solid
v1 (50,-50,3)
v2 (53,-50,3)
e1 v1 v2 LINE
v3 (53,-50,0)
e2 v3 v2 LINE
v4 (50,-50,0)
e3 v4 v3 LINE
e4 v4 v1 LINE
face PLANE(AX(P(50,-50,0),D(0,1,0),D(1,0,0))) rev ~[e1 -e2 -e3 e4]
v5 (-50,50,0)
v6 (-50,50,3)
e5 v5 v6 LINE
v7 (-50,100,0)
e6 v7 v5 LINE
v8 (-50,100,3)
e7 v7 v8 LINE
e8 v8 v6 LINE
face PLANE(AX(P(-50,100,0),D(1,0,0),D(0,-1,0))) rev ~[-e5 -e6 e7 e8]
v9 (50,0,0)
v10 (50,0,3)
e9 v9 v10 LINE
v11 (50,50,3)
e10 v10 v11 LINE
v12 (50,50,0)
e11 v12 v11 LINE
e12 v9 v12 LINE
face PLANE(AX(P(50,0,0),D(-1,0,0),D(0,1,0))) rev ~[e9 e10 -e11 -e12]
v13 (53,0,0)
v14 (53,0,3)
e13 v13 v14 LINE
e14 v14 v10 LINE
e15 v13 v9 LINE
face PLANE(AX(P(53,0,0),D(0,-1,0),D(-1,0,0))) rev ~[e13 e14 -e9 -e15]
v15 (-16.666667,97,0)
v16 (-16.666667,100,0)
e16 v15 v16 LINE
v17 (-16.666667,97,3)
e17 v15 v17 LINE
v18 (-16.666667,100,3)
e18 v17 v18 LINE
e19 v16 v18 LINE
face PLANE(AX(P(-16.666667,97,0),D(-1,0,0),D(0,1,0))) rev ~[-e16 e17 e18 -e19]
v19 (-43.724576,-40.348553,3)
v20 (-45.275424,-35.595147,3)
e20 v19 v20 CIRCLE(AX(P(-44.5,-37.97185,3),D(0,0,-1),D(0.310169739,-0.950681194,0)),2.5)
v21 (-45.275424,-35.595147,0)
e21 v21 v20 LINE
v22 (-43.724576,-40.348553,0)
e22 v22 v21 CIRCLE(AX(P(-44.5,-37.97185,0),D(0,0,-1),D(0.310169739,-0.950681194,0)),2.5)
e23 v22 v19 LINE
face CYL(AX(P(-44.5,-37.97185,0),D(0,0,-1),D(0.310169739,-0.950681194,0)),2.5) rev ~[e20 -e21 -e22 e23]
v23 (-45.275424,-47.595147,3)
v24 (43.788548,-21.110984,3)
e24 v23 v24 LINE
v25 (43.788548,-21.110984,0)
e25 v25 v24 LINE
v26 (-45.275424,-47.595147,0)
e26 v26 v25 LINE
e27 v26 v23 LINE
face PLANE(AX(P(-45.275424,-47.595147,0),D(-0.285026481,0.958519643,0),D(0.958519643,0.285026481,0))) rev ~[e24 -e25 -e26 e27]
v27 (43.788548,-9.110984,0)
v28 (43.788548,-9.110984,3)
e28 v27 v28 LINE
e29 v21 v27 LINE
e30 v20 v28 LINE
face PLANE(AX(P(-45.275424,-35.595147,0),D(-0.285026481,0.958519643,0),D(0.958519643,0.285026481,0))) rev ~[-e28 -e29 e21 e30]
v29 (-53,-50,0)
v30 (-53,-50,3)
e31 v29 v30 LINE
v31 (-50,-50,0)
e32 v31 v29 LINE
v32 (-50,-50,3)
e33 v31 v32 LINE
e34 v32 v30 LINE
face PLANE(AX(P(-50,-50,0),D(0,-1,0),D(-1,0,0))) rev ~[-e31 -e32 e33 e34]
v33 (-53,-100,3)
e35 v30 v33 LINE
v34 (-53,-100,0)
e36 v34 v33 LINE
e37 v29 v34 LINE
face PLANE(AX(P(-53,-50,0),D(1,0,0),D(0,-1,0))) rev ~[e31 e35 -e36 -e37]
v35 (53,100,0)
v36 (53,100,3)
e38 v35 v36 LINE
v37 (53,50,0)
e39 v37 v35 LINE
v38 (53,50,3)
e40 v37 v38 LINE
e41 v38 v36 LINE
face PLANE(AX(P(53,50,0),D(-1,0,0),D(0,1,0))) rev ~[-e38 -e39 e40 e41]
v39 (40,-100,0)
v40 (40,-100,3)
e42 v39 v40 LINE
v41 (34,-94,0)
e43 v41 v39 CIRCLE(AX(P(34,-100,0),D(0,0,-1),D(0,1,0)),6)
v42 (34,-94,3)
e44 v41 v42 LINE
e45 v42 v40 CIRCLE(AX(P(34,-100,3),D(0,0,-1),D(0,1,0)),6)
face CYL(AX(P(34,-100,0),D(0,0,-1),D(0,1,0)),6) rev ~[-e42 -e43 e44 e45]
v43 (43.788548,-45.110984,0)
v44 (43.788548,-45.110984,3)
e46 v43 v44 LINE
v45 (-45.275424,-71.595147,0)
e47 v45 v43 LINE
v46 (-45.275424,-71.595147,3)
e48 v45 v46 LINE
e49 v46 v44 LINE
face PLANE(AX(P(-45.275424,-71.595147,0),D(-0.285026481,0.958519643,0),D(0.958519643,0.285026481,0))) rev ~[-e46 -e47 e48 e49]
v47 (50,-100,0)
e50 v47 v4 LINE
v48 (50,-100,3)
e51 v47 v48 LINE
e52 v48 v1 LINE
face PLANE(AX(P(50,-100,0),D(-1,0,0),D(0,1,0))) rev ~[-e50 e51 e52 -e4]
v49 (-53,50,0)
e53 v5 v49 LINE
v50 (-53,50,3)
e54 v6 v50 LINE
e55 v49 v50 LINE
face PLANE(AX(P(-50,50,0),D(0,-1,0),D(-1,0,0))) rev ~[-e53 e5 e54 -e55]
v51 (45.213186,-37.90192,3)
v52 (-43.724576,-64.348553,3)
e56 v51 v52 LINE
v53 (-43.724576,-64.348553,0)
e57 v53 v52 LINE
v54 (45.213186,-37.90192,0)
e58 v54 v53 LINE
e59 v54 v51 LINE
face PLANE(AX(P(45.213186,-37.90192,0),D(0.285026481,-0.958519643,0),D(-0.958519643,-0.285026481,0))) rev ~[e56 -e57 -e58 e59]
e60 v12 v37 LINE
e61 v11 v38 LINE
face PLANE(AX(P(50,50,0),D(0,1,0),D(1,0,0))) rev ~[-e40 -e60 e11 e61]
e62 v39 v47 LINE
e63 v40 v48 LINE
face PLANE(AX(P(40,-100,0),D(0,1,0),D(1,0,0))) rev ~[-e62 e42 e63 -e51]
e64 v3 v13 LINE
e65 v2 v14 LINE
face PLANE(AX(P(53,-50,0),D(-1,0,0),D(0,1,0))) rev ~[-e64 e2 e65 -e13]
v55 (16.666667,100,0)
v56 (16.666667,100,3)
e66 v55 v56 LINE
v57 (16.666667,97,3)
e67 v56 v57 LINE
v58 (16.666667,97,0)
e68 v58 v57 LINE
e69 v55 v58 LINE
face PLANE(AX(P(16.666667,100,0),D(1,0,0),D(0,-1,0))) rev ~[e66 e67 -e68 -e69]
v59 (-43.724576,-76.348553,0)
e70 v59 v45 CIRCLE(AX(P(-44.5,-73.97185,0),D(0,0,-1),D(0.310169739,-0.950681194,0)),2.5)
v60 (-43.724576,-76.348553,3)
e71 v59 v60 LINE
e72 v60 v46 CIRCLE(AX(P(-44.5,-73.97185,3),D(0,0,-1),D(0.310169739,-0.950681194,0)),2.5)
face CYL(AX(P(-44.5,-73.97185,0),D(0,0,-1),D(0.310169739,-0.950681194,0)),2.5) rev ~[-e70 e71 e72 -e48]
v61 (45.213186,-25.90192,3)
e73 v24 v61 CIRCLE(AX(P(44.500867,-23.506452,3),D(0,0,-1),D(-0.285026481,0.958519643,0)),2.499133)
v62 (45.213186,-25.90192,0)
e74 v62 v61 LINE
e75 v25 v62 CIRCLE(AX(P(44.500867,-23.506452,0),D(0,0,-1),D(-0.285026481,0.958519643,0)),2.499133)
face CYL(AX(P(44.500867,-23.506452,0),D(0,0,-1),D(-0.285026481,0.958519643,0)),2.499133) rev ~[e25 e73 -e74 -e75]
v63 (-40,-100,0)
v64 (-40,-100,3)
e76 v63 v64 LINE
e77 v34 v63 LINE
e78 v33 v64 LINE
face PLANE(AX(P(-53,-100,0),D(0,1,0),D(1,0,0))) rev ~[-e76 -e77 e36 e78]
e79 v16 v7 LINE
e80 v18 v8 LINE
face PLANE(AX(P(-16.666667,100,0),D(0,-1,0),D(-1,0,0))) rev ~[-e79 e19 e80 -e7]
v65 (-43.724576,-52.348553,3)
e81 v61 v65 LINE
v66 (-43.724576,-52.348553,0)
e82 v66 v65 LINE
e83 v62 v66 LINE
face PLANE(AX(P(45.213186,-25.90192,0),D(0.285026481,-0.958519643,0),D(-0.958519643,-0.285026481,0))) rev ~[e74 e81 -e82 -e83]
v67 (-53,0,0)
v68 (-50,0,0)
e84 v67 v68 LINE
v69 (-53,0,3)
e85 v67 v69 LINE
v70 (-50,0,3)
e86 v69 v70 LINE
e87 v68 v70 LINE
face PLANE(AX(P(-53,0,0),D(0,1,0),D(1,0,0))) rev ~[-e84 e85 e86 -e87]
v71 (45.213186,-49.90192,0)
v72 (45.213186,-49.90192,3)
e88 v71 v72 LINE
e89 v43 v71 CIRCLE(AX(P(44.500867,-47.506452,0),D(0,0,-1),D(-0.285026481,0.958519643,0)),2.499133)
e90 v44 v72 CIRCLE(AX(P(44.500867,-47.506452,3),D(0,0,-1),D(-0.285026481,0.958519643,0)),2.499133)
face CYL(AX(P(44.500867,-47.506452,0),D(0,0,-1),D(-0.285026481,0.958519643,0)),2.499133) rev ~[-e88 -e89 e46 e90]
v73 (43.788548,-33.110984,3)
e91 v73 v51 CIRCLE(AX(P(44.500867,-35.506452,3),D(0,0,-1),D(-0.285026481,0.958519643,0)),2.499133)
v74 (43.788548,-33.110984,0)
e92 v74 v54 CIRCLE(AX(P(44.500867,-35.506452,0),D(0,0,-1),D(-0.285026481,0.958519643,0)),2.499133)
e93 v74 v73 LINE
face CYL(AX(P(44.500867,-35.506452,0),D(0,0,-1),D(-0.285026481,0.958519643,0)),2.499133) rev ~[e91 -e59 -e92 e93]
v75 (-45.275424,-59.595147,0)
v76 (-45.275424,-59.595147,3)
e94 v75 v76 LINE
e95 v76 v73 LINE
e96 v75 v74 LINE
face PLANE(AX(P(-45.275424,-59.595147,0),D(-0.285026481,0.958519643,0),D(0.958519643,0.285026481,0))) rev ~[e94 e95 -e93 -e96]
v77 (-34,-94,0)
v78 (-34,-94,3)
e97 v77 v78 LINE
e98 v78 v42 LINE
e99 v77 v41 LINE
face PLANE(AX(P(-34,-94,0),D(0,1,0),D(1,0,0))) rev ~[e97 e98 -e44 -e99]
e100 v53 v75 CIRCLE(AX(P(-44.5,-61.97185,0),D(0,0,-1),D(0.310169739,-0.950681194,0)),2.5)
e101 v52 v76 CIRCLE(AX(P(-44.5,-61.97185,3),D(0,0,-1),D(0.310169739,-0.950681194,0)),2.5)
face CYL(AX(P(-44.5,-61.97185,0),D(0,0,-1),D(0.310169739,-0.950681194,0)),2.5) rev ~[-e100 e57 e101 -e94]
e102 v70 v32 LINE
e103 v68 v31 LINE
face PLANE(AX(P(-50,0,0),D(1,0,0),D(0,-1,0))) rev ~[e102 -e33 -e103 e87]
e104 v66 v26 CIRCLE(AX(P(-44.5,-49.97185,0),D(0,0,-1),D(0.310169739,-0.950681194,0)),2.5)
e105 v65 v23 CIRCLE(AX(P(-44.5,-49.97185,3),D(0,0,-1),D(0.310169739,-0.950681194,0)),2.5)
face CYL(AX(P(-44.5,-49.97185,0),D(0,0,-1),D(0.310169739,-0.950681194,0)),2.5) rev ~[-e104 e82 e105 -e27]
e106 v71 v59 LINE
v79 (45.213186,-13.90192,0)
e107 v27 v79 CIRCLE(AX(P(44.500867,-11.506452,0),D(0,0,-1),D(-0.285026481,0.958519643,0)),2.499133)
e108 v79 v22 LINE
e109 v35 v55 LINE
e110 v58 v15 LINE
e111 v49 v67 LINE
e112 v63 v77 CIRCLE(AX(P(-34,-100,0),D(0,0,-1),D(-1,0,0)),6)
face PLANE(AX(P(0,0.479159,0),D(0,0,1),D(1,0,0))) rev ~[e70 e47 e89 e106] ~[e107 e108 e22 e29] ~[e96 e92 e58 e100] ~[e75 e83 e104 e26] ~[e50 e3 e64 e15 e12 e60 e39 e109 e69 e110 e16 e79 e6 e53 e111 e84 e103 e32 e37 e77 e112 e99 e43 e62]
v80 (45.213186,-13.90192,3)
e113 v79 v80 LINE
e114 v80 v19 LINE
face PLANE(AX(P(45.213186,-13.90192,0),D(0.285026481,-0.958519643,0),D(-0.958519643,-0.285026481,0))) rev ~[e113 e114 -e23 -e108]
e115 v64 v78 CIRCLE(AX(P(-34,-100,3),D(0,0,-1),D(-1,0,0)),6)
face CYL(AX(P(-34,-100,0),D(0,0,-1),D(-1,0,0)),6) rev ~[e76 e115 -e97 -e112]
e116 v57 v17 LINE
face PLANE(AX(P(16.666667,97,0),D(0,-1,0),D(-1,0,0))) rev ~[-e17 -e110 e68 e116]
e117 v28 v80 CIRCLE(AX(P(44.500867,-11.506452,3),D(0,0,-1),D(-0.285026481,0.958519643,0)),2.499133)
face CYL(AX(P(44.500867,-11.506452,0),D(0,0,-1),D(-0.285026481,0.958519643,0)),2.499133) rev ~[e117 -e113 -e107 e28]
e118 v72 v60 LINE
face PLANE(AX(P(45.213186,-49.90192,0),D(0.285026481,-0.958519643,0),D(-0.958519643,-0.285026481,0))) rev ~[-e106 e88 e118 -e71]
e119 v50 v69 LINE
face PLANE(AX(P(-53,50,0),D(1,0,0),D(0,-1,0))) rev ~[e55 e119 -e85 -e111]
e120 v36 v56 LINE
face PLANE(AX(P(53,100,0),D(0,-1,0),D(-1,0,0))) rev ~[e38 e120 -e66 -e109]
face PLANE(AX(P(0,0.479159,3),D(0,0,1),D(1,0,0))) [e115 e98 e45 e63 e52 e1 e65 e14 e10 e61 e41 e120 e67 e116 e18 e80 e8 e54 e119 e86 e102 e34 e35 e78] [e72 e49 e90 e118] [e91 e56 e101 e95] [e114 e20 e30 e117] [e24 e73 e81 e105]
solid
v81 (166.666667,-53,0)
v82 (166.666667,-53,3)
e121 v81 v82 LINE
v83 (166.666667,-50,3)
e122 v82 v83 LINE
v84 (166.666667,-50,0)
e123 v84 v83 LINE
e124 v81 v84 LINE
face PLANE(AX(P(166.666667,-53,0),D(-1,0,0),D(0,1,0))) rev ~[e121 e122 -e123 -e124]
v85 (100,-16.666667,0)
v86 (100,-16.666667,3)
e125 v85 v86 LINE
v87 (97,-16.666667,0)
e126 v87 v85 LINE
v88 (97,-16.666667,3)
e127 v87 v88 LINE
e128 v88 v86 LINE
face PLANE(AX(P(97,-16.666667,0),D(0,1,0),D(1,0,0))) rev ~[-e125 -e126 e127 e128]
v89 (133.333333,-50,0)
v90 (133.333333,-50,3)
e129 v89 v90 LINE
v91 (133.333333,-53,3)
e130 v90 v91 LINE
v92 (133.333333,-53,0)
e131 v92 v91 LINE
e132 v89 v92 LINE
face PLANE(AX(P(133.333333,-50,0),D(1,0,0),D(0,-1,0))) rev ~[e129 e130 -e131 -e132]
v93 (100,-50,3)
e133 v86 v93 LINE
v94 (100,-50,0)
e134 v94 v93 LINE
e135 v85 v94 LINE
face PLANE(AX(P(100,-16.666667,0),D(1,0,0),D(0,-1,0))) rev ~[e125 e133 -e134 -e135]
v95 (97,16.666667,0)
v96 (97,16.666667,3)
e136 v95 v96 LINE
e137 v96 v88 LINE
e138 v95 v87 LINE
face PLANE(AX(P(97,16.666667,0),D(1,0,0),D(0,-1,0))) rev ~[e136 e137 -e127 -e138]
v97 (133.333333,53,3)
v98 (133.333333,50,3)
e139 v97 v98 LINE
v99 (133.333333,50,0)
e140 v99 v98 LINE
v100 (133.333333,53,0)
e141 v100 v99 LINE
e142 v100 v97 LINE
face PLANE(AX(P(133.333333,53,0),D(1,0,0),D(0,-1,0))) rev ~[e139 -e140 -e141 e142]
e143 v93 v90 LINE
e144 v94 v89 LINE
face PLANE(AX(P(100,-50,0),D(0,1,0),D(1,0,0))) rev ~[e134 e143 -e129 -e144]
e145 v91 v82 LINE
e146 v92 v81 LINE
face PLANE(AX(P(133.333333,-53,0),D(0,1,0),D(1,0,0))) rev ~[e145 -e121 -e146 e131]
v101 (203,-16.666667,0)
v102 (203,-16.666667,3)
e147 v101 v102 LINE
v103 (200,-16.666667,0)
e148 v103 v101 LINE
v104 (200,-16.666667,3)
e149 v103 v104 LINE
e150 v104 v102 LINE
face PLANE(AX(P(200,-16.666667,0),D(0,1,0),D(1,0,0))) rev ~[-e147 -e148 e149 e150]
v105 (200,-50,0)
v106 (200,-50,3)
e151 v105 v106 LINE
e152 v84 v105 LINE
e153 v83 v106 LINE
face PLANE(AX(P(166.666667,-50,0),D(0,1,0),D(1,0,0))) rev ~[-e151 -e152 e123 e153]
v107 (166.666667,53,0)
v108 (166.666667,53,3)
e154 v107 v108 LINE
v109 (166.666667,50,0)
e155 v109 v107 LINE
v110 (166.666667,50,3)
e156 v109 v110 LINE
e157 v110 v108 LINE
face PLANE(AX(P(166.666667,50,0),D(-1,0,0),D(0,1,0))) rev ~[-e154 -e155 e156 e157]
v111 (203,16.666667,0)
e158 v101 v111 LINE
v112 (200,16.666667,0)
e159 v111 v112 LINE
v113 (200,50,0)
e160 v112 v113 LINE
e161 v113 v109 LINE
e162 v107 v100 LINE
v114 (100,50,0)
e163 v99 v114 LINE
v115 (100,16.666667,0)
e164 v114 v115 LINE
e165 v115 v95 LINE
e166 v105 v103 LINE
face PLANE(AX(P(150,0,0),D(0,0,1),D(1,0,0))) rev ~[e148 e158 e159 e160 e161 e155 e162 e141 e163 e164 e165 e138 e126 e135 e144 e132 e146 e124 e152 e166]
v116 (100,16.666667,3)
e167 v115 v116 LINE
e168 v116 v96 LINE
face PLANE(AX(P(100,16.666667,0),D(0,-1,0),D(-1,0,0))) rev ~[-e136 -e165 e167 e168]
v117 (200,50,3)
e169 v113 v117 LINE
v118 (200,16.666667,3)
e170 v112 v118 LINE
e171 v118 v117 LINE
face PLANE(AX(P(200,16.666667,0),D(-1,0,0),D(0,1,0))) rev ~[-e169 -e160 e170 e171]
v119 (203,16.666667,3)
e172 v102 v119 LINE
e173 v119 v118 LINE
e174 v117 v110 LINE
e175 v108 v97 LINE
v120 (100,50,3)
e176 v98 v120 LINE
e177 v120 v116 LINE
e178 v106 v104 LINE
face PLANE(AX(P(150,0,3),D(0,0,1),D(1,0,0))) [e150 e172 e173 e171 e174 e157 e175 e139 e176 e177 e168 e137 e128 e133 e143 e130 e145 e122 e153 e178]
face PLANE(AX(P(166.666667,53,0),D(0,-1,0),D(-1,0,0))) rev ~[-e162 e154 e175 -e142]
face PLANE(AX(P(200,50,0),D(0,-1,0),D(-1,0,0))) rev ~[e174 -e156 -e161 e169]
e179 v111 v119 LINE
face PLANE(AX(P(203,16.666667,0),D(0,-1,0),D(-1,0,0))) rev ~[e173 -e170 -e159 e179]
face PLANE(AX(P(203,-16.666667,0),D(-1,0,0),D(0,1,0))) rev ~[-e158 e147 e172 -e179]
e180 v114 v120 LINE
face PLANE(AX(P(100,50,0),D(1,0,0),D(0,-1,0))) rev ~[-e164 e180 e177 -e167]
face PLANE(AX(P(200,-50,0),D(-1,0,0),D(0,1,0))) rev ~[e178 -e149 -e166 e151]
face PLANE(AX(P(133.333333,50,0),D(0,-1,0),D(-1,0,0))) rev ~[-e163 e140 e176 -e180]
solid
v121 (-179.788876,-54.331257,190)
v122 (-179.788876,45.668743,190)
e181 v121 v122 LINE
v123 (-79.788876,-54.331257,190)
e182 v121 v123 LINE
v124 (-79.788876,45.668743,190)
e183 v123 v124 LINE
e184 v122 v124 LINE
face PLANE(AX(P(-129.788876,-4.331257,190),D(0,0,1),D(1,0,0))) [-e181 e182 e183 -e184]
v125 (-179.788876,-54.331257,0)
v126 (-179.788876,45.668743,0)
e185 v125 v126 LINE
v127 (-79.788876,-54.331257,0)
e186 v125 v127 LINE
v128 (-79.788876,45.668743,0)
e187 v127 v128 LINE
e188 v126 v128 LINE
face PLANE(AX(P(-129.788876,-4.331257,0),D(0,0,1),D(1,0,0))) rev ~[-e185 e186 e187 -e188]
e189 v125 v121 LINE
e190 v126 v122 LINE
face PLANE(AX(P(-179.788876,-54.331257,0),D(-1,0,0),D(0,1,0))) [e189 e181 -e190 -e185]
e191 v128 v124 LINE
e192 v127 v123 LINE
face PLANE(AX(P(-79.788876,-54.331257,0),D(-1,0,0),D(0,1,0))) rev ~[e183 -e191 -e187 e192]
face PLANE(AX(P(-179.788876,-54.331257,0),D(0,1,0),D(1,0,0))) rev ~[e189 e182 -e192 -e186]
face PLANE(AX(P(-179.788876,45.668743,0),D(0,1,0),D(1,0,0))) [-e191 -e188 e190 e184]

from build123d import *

# Parameters (mm, degrees)
F1_DEPTH = 3
F2_W     = 100
F2_H     = 100
F3_DEPTH = 190


# Not quite as in the source:
# - a feature names something its author has since deleted; it is built from what else it names


with BuildPart() as f1:
    # F0 (on Top) → F1 (new body)
    with BuildSketch(Plane.XY):
        with BuildLine():
            Line((-16.6666666667, 100), (-50, 100))
            Line((-50, 100), (-50, 50))
            Line((-50, 50), (-53, 50))
            Line((-53, 50), (-53, 0))
            Line((-53, 0), (-50, 0))
            Line((-50, 0), (-50, -50))
            Line((-50, -50), (-53, -50))
            Line((-53, -50), (-53, -100))
            Line((-53, -100), (-50, -100))
            Line((-50, -100), (-40, -100))
            ThreePointArc((-40, -100), (-38.2426406871, -95.7573593129), (-34, -94))
            Line((-34, -94), (34, -94))
            ThreePointArc((34, -94), (38.2426406871, -95.7573593129), (40, -100))
            Line((40, -100), (50, -100))
            Line((50, -100), (50, -50))
            Line((50, -50), (53, -50))
            Line((53, -50), (53, 0))
            Line((53, 0), (50, 0))
            Line((50, 0), (50, 50))
            Line((50, 50), (53, 50))
            Line((53, 50), (53, 100))
            Line((53, 100), (50, 100))
            Line((50, 100), (16.6666666667, 100))
            Line((16.6666666667, 100), (16.6666666667, 97))
            Line((16.6666666667, 97), (-16.6666666667, 97))
            Line((-16.6666666667, 97), (-16.6666666667, 100))
        make_face()
        with BuildLine():
            ThreePointArc((-43.7245756516, -76.3485534214), (-46.8767029852, -74.7472747846), (-45.2754243484, -71.595147451))
            Line((-45.2754243484, -71.595147451), (43.7885479556, -45.1109843029))
            ThreePointArc((43.7885479556, -45.1109843029), (46.8963350712, -46.7941332679), (45.2131861062, -49.9019203835))
            Line((45.2131861062, -49.9019203835), (-43.7245756516, -76.3485534214))
        make_face(mode=Mode.SUBTRACT)
        with BuildLine():
            Line((45.2131861062, -37.9019203835), (-43.7245756516, -64.3485534214))
            ThreePointArc((-43.7245756516, -64.3485534214), (-46.8767029852, -62.7472747846), (-45.2754243484, -59.595147451))
            Line((-45.2754243484, -59.595147451), (43.7885479556, -33.1109843029))
            ThreePointArc((43.7885479556, -33.1109843029), (46.8963350712, -34.7941332679), (45.2131861062, -37.9019203835))
        make_face(mode=Mode.SUBTRACT)
        with BuildLine():
            Line((45.2131861062, -25.9019203835), (-43.7245756516, -52.3485534214))
            ThreePointArc((-43.7245756516, -52.3485534214), (-46.8767029852, -50.7472747846), (-45.2754243484, -47.595147451))
            Line((-45.2754243484, -47.595147451), (43.7885479556, -21.1109843029))
            ThreePointArc((43.7885479556, -21.1109843029), (46.8963350712, -22.7941332679), (45.2131861062, -25.9019203835))
        make_face(mode=Mode.SUBTRACT)
        with BuildLine():
            Line((45.2131861062, -13.9019203835), (-43.7245756516, -40.3485534214))
            ThreePointArc((-43.7245756516, -40.3485534214), (-46.8767029852, -38.7472747846), (-45.2754243484, -35.595147451))
            Line((-45.2754243484, -35.595147451), (43.7885479556, -9.1109843029))
            ThreePointArc((43.7885479556, -9.1109843029), (46.8963350712, -10.7941332679), (45.2131861062, -13.9019203835))
        make_face(mode=Mode.SUBTRACT)
    extrude(amount=F1_DEPTH)


with BuildPart() as f1b:
    # F0 (on Top) → F1, piece 2 (new body)
    with BuildSketch(Plane.XY):
        Polygon((133.3333333333, 50), (100, 50), (100, 16.6666666667), (97, 16.6666666667), (97, -16.6666666667), (100, -16.6666666667), (100, -50), (133.3333333333, -50), (133.3333333333, -53), (166.6666666667, -53), (166.6666666667, -50), (200, -50), (200, -16.6666666667), (203, -16.6666666667), (203, 16.6666666667), (200, 16.6666666667), (200, 50), (166.6666666667, 50), (166.6666666667, 53), (133.3333333333, 53), align=None)
    extrude(amount=F1_DEPTH)


with BuildPart() as f3:
    # F2 (on Top) → F3 (new body)
    with BuildSketch(Plane.XY):
        with Locations((-129.7888755798, -4.3312566519)):
            Rectangle(F2_W, F2_H)
    extrude(amount=F3_DEPTH)


solid = Compound([f1.part, f1b.part, f3.part])
